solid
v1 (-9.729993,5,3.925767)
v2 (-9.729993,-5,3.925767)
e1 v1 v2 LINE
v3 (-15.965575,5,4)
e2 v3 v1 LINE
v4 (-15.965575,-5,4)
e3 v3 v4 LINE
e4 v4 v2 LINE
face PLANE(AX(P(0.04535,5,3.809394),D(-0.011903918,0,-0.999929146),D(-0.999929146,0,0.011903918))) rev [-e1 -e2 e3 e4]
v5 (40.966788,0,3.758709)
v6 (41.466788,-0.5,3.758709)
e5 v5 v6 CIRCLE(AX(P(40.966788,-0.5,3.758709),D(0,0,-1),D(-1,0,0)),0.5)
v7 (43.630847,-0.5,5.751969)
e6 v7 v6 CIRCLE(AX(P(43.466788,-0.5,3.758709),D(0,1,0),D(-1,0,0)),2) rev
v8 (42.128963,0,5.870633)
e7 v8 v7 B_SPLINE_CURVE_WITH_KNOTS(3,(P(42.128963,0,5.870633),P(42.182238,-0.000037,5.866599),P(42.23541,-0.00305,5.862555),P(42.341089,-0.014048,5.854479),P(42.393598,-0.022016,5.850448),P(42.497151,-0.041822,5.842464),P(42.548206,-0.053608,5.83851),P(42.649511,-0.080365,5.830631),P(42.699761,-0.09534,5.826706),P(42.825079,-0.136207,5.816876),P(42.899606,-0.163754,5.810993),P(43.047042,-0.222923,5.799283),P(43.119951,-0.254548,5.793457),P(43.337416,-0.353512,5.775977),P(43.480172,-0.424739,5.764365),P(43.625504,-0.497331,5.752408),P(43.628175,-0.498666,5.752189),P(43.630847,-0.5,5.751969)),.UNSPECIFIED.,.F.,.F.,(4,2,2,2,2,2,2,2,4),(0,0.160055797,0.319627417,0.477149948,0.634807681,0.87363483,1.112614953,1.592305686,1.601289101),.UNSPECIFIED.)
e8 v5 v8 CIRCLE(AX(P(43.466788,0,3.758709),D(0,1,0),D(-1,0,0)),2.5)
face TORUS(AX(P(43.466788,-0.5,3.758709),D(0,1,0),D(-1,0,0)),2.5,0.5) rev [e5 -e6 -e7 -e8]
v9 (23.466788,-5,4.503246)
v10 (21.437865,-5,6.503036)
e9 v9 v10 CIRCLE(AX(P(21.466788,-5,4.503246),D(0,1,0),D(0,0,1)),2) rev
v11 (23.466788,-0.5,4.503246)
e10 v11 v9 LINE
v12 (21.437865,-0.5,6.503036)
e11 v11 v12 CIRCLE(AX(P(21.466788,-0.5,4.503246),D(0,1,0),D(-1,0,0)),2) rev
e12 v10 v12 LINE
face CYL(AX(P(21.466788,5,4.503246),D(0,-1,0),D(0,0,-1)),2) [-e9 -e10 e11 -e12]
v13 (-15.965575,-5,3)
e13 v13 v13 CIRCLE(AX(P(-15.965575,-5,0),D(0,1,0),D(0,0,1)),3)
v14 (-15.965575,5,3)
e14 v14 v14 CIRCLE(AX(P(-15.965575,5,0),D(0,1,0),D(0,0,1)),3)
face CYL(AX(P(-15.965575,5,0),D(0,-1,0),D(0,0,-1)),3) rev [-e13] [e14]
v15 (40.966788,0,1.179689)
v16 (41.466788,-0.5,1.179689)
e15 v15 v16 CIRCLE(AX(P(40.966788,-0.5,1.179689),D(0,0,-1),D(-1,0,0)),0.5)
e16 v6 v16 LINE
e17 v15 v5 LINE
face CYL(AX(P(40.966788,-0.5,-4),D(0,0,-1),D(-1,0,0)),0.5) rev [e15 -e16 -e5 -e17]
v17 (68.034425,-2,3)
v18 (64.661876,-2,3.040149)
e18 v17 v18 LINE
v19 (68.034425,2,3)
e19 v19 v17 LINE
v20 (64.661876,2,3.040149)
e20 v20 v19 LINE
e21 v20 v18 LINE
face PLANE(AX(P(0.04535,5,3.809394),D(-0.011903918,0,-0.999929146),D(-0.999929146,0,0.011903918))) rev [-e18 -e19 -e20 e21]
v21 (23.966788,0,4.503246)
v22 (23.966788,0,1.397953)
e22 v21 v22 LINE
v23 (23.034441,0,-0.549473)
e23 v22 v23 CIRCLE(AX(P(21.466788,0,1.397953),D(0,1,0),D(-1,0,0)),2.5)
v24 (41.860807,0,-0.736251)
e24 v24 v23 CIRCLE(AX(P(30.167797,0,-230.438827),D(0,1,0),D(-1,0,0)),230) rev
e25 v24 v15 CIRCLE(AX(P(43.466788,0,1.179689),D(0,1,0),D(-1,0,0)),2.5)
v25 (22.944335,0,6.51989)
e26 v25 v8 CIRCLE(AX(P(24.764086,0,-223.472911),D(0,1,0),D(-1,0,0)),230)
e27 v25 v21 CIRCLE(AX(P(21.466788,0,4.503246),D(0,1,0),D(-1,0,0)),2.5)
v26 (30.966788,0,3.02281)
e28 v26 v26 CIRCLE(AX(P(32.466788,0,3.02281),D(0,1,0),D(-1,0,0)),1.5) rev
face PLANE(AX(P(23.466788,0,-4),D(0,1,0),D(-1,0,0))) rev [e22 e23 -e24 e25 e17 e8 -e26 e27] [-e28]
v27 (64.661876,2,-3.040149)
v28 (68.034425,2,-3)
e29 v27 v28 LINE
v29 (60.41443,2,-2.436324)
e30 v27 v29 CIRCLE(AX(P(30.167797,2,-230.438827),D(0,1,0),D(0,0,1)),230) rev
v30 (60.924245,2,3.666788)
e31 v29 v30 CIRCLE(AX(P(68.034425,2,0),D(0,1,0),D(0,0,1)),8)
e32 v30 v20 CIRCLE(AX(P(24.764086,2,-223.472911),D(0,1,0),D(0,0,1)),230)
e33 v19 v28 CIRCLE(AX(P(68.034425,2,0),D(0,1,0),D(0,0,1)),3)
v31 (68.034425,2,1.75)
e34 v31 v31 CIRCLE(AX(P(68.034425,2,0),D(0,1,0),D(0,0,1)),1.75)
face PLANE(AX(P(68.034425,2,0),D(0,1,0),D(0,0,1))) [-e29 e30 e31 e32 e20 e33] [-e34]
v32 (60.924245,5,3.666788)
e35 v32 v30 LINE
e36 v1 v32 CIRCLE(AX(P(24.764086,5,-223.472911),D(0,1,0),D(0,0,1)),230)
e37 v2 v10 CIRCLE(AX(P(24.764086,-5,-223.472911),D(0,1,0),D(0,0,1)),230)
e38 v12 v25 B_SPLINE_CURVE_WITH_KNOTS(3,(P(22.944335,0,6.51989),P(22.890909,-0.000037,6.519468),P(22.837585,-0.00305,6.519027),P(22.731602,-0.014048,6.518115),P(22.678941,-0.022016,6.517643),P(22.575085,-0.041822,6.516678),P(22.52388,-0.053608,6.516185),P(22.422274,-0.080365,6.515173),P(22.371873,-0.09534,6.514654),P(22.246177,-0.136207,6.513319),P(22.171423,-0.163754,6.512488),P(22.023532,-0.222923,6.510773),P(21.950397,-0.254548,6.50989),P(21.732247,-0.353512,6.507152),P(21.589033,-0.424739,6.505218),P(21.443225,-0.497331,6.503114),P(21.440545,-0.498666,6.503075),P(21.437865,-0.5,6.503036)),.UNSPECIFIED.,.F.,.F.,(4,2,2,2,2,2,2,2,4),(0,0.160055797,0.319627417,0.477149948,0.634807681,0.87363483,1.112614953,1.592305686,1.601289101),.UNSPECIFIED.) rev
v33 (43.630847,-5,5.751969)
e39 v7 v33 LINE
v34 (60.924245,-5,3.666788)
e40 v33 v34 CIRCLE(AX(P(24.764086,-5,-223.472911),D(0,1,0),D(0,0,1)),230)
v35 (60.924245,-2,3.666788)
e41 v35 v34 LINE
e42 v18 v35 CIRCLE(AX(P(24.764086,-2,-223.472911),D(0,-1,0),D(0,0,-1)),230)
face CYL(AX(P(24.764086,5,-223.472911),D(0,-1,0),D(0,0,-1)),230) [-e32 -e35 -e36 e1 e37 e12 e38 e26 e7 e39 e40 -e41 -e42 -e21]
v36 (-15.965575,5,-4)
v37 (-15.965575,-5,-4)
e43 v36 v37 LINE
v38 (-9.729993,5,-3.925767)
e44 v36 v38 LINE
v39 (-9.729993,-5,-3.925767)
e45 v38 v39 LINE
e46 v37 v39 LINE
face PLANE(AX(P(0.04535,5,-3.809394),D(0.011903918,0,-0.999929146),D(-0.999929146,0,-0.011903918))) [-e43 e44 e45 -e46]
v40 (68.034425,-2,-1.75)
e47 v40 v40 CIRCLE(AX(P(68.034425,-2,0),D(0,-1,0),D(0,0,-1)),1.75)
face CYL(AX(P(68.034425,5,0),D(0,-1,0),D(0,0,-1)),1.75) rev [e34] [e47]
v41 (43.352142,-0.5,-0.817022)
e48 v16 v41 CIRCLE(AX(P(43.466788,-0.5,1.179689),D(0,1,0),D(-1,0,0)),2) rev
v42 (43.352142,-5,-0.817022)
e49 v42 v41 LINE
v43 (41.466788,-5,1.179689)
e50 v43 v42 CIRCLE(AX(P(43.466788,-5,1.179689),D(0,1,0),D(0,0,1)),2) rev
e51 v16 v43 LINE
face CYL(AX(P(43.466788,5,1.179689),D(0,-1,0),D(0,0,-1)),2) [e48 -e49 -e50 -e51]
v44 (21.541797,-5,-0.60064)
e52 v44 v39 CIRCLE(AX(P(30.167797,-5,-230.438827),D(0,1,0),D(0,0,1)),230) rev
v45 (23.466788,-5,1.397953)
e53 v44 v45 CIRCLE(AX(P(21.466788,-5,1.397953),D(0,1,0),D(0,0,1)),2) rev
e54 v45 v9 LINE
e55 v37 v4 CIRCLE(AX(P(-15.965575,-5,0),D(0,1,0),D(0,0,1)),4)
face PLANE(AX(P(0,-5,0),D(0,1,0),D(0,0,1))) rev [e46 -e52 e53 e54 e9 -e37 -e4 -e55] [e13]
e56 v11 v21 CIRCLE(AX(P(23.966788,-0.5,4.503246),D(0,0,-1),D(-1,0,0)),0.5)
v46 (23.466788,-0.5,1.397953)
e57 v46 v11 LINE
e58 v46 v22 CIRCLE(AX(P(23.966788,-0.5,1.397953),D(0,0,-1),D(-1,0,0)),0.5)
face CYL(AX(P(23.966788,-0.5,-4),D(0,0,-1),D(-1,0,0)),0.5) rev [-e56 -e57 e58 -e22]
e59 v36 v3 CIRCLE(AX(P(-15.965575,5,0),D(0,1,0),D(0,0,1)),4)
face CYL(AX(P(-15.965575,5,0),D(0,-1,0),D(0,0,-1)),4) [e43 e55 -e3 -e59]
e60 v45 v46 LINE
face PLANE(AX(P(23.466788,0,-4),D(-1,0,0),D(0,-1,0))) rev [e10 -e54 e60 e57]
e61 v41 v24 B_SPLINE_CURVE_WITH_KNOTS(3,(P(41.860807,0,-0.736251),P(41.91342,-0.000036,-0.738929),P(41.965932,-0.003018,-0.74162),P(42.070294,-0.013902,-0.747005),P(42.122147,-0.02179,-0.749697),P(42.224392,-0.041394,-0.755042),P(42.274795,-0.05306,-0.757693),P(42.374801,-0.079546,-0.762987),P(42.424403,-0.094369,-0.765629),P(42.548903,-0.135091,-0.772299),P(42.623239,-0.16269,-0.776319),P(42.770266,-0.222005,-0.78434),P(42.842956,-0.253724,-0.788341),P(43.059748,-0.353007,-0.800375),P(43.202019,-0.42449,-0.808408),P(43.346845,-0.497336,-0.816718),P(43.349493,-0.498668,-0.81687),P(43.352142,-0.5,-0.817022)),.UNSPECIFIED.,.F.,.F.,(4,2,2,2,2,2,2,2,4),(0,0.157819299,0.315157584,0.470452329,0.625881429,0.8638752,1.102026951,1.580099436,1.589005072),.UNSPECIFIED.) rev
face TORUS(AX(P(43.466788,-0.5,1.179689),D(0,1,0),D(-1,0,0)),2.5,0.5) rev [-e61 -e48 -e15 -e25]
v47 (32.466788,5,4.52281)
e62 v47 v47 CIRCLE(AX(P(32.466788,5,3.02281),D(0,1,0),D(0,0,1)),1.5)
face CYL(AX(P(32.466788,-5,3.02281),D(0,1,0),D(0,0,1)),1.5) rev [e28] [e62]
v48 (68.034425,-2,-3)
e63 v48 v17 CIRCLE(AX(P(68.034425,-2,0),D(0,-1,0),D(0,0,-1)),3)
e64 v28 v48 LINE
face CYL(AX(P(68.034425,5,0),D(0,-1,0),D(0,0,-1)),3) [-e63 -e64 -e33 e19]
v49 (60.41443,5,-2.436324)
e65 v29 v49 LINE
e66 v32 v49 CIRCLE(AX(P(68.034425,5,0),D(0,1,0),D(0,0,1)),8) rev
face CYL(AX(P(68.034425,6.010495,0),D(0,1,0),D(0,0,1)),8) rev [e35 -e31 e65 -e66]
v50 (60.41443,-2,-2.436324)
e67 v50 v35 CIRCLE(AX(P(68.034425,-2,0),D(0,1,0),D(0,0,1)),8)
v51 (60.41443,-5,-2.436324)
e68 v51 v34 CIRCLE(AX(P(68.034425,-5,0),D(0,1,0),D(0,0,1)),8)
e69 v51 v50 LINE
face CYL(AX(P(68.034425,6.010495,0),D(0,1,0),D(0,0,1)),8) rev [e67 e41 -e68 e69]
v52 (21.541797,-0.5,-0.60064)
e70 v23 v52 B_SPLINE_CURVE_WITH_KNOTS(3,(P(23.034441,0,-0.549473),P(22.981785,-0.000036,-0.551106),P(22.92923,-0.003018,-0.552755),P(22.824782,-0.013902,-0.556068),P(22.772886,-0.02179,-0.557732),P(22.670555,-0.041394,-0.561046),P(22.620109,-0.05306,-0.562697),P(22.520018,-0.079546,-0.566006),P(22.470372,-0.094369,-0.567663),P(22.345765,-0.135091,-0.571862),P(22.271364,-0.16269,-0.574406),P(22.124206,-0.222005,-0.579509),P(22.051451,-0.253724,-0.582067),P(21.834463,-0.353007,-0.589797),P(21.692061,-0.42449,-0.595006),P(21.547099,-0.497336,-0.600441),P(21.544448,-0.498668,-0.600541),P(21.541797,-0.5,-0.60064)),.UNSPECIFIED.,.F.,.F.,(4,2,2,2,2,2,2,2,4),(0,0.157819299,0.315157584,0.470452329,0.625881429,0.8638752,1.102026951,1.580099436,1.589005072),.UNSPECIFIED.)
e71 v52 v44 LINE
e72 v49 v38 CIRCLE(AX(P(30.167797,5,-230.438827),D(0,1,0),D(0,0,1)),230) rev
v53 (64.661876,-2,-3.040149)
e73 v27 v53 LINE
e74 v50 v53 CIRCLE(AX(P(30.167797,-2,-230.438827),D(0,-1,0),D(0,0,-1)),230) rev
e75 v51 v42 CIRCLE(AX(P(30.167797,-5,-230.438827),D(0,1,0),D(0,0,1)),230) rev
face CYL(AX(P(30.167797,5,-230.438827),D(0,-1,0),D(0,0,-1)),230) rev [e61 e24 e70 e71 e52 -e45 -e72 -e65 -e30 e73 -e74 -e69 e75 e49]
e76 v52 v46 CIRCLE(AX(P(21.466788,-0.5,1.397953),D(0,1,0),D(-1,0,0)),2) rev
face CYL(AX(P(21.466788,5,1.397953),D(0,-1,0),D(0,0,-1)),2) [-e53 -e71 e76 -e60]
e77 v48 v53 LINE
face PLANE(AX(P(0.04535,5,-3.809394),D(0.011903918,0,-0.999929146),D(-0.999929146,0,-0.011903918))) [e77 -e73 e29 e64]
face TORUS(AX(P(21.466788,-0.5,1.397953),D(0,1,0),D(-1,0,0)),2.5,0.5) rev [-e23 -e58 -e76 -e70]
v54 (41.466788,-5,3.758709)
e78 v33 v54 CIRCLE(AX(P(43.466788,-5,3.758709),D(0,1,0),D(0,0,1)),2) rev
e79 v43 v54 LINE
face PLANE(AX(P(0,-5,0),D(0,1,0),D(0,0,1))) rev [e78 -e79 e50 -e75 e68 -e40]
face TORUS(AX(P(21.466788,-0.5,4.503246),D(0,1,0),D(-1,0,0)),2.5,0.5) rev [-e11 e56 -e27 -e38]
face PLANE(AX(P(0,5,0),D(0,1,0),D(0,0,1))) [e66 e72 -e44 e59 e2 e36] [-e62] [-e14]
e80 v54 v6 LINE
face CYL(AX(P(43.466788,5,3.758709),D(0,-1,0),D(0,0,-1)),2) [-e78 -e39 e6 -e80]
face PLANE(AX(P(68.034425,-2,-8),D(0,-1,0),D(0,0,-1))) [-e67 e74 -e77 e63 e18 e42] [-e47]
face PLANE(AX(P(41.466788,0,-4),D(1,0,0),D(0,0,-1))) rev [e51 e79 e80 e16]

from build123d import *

# Parameters (mm, degrees)
SKETCH1_R               = 3
SKETCH1_R_2             = 1.75
BOSS_EXTRUDE1_DEPTH     = 5
SKETCH3_W               = 8
SKETCH3_H               = 3
SKETCH3_H_2             = 4.010495491
SKETCH4_R               = 1.5
CUT_EXTRUDE1_DEPTH      = 10
CUT_EXTRUDE3_DEPTH      = 72.508687789
CUT_EXTRUDE3_DEPTH_BACK = 72.508687789
SKETCH7_W               = 18
SKETCH7_H               = 5
FILLET2_R               = 2
FILLET3_R               = 0.5


with BuildPart() as part:
    # Sketch1 → Boss-Extrude1 (new, symmetric)
    with BuildSketch(Plane(origin=(0, 0, 0), x_dir=(1, 0, 0), z_dir=(0, 1, 0))):
        with BuildLine():
            Line((-9.729992932, 3.92576688), (-15.965575011, 4))
            ThreePointArc((-15.965575011, 4), (-19.965575011, 0), (-15.965575011, -4))
            Line((-15.965575011, -4), (-9.729992932, -3.92576688))
            ThreePointArc((-9.729992932, -3.92576688), (27.50198709, -6.510792927), (64.661875809, -3.040149395))
            Line((64.661875809, -3.040149395), (68.034424989, -3))
            ThreePointArc((68.034424989, -3), (71.034424989, 0), (68.034424989, 3))
            Line((68.034424989, 3), (64.661875809, 3.040149395))
            ThreePointArc((64.661875809, 3.040149395), (27.429895786, 0.455123348), (-9.729992932, 3.92576688))
        make_face()
        with Locations((-15.965575011, 0)):
            Circle(SKETCH1_R, mode=Mode.SUBTRACT)
        with Locations((68.034424989, 0)):
            Circle(SKETCH1_R_2, mode=Mode.SUBTRACT)
    extrude(amount=BOSS_EXTRUDE1_DEPTH, both=True)

    # Sketch3 → Cut-Revolve1 (revolve, cut)
    with BuildSketch(Plane(origin=(68.034424989, 0, 0), x_dir=(0, 0, -1), z_dir=(1, 0, 0))):
        with Locations((4, -3.5)):
            Rectangle(SKETCH3_W, SKETCH3_H)
        with Locations((4, 4.005247746)):
            Rectangle(SKETCH3_W, SKETCH3_H_2)
    revolve(axis=Axis((68.034424989, 6.010495491, 0), (0, -1, 0)), mode=Mode.SUBTRACT)

    # Sketch4 → Cut-Extrude1 (cut)
    with BuildSketch(Plane(origin=(0, 5, 0), x_dir=(1, 0, 0), z_dir=(0, 1, 0))):
        with Locations((32.466788231, -3.022809684)):
            Circle(SKETCH4_R)
    extrude(amount=-CUT_EXTRUDE1_DEPTH, mode=Mode.SUBTRACT)

    # Sketch7 → Cut-Extrude3 (cut, two sides: drawn at the far end of the back side and taken through both)
    with BuildSketch(Plane.XY.offset(-CUT_EXTRUDE3_DEPTH_BACK)):
        with Locations((32.466788231, -2.5)):
            Rectangle(SKETCH7_W, SKETCH7_H)
    extrude(amount=CUT_EXTRUDE3_DEPTH + CUT_EXTRUDE3_DEPTH_BACK, mode=Mode.SUBTRACT)

    # Fillet2
    fillet2_edges = [part.edges().sort_by_distance(p)[0] for p in [
        (23.466788231, -2.5, -0.536463963),
        (41.466788231, -2.5, -0.716531943),
        (41.466788231, -2.5, 5.919808824),
        (23.466788231, -2.5, 6.523430697),
    ]]
    fillet(fillet2_edges, radius=FILLET2_R)

    # Fillet3
    fillet3_edges = [part.edges().sort_by_distance(p)[0] for p in [
        (23.466788231, 0, 2.950599255),
        (22.870738492, 0, 5.927648567),
        (22.907277279, 0, 0.0105123),
    ]]
    fillet(fillet3_edges, radius=FILLET3_R)
    fillet3_2_edges = [part.edges().sort_by_distance(p)[0] for p in [
        (42.111819151, 0, 5.229782959),
        (41.466788231, 0, 2.469198888),
        (42.012605823, 0, -0.193392918),
    ]]
    fillet(fillet3_2_edges, radius=FILLET3_R)


solid = part.part
